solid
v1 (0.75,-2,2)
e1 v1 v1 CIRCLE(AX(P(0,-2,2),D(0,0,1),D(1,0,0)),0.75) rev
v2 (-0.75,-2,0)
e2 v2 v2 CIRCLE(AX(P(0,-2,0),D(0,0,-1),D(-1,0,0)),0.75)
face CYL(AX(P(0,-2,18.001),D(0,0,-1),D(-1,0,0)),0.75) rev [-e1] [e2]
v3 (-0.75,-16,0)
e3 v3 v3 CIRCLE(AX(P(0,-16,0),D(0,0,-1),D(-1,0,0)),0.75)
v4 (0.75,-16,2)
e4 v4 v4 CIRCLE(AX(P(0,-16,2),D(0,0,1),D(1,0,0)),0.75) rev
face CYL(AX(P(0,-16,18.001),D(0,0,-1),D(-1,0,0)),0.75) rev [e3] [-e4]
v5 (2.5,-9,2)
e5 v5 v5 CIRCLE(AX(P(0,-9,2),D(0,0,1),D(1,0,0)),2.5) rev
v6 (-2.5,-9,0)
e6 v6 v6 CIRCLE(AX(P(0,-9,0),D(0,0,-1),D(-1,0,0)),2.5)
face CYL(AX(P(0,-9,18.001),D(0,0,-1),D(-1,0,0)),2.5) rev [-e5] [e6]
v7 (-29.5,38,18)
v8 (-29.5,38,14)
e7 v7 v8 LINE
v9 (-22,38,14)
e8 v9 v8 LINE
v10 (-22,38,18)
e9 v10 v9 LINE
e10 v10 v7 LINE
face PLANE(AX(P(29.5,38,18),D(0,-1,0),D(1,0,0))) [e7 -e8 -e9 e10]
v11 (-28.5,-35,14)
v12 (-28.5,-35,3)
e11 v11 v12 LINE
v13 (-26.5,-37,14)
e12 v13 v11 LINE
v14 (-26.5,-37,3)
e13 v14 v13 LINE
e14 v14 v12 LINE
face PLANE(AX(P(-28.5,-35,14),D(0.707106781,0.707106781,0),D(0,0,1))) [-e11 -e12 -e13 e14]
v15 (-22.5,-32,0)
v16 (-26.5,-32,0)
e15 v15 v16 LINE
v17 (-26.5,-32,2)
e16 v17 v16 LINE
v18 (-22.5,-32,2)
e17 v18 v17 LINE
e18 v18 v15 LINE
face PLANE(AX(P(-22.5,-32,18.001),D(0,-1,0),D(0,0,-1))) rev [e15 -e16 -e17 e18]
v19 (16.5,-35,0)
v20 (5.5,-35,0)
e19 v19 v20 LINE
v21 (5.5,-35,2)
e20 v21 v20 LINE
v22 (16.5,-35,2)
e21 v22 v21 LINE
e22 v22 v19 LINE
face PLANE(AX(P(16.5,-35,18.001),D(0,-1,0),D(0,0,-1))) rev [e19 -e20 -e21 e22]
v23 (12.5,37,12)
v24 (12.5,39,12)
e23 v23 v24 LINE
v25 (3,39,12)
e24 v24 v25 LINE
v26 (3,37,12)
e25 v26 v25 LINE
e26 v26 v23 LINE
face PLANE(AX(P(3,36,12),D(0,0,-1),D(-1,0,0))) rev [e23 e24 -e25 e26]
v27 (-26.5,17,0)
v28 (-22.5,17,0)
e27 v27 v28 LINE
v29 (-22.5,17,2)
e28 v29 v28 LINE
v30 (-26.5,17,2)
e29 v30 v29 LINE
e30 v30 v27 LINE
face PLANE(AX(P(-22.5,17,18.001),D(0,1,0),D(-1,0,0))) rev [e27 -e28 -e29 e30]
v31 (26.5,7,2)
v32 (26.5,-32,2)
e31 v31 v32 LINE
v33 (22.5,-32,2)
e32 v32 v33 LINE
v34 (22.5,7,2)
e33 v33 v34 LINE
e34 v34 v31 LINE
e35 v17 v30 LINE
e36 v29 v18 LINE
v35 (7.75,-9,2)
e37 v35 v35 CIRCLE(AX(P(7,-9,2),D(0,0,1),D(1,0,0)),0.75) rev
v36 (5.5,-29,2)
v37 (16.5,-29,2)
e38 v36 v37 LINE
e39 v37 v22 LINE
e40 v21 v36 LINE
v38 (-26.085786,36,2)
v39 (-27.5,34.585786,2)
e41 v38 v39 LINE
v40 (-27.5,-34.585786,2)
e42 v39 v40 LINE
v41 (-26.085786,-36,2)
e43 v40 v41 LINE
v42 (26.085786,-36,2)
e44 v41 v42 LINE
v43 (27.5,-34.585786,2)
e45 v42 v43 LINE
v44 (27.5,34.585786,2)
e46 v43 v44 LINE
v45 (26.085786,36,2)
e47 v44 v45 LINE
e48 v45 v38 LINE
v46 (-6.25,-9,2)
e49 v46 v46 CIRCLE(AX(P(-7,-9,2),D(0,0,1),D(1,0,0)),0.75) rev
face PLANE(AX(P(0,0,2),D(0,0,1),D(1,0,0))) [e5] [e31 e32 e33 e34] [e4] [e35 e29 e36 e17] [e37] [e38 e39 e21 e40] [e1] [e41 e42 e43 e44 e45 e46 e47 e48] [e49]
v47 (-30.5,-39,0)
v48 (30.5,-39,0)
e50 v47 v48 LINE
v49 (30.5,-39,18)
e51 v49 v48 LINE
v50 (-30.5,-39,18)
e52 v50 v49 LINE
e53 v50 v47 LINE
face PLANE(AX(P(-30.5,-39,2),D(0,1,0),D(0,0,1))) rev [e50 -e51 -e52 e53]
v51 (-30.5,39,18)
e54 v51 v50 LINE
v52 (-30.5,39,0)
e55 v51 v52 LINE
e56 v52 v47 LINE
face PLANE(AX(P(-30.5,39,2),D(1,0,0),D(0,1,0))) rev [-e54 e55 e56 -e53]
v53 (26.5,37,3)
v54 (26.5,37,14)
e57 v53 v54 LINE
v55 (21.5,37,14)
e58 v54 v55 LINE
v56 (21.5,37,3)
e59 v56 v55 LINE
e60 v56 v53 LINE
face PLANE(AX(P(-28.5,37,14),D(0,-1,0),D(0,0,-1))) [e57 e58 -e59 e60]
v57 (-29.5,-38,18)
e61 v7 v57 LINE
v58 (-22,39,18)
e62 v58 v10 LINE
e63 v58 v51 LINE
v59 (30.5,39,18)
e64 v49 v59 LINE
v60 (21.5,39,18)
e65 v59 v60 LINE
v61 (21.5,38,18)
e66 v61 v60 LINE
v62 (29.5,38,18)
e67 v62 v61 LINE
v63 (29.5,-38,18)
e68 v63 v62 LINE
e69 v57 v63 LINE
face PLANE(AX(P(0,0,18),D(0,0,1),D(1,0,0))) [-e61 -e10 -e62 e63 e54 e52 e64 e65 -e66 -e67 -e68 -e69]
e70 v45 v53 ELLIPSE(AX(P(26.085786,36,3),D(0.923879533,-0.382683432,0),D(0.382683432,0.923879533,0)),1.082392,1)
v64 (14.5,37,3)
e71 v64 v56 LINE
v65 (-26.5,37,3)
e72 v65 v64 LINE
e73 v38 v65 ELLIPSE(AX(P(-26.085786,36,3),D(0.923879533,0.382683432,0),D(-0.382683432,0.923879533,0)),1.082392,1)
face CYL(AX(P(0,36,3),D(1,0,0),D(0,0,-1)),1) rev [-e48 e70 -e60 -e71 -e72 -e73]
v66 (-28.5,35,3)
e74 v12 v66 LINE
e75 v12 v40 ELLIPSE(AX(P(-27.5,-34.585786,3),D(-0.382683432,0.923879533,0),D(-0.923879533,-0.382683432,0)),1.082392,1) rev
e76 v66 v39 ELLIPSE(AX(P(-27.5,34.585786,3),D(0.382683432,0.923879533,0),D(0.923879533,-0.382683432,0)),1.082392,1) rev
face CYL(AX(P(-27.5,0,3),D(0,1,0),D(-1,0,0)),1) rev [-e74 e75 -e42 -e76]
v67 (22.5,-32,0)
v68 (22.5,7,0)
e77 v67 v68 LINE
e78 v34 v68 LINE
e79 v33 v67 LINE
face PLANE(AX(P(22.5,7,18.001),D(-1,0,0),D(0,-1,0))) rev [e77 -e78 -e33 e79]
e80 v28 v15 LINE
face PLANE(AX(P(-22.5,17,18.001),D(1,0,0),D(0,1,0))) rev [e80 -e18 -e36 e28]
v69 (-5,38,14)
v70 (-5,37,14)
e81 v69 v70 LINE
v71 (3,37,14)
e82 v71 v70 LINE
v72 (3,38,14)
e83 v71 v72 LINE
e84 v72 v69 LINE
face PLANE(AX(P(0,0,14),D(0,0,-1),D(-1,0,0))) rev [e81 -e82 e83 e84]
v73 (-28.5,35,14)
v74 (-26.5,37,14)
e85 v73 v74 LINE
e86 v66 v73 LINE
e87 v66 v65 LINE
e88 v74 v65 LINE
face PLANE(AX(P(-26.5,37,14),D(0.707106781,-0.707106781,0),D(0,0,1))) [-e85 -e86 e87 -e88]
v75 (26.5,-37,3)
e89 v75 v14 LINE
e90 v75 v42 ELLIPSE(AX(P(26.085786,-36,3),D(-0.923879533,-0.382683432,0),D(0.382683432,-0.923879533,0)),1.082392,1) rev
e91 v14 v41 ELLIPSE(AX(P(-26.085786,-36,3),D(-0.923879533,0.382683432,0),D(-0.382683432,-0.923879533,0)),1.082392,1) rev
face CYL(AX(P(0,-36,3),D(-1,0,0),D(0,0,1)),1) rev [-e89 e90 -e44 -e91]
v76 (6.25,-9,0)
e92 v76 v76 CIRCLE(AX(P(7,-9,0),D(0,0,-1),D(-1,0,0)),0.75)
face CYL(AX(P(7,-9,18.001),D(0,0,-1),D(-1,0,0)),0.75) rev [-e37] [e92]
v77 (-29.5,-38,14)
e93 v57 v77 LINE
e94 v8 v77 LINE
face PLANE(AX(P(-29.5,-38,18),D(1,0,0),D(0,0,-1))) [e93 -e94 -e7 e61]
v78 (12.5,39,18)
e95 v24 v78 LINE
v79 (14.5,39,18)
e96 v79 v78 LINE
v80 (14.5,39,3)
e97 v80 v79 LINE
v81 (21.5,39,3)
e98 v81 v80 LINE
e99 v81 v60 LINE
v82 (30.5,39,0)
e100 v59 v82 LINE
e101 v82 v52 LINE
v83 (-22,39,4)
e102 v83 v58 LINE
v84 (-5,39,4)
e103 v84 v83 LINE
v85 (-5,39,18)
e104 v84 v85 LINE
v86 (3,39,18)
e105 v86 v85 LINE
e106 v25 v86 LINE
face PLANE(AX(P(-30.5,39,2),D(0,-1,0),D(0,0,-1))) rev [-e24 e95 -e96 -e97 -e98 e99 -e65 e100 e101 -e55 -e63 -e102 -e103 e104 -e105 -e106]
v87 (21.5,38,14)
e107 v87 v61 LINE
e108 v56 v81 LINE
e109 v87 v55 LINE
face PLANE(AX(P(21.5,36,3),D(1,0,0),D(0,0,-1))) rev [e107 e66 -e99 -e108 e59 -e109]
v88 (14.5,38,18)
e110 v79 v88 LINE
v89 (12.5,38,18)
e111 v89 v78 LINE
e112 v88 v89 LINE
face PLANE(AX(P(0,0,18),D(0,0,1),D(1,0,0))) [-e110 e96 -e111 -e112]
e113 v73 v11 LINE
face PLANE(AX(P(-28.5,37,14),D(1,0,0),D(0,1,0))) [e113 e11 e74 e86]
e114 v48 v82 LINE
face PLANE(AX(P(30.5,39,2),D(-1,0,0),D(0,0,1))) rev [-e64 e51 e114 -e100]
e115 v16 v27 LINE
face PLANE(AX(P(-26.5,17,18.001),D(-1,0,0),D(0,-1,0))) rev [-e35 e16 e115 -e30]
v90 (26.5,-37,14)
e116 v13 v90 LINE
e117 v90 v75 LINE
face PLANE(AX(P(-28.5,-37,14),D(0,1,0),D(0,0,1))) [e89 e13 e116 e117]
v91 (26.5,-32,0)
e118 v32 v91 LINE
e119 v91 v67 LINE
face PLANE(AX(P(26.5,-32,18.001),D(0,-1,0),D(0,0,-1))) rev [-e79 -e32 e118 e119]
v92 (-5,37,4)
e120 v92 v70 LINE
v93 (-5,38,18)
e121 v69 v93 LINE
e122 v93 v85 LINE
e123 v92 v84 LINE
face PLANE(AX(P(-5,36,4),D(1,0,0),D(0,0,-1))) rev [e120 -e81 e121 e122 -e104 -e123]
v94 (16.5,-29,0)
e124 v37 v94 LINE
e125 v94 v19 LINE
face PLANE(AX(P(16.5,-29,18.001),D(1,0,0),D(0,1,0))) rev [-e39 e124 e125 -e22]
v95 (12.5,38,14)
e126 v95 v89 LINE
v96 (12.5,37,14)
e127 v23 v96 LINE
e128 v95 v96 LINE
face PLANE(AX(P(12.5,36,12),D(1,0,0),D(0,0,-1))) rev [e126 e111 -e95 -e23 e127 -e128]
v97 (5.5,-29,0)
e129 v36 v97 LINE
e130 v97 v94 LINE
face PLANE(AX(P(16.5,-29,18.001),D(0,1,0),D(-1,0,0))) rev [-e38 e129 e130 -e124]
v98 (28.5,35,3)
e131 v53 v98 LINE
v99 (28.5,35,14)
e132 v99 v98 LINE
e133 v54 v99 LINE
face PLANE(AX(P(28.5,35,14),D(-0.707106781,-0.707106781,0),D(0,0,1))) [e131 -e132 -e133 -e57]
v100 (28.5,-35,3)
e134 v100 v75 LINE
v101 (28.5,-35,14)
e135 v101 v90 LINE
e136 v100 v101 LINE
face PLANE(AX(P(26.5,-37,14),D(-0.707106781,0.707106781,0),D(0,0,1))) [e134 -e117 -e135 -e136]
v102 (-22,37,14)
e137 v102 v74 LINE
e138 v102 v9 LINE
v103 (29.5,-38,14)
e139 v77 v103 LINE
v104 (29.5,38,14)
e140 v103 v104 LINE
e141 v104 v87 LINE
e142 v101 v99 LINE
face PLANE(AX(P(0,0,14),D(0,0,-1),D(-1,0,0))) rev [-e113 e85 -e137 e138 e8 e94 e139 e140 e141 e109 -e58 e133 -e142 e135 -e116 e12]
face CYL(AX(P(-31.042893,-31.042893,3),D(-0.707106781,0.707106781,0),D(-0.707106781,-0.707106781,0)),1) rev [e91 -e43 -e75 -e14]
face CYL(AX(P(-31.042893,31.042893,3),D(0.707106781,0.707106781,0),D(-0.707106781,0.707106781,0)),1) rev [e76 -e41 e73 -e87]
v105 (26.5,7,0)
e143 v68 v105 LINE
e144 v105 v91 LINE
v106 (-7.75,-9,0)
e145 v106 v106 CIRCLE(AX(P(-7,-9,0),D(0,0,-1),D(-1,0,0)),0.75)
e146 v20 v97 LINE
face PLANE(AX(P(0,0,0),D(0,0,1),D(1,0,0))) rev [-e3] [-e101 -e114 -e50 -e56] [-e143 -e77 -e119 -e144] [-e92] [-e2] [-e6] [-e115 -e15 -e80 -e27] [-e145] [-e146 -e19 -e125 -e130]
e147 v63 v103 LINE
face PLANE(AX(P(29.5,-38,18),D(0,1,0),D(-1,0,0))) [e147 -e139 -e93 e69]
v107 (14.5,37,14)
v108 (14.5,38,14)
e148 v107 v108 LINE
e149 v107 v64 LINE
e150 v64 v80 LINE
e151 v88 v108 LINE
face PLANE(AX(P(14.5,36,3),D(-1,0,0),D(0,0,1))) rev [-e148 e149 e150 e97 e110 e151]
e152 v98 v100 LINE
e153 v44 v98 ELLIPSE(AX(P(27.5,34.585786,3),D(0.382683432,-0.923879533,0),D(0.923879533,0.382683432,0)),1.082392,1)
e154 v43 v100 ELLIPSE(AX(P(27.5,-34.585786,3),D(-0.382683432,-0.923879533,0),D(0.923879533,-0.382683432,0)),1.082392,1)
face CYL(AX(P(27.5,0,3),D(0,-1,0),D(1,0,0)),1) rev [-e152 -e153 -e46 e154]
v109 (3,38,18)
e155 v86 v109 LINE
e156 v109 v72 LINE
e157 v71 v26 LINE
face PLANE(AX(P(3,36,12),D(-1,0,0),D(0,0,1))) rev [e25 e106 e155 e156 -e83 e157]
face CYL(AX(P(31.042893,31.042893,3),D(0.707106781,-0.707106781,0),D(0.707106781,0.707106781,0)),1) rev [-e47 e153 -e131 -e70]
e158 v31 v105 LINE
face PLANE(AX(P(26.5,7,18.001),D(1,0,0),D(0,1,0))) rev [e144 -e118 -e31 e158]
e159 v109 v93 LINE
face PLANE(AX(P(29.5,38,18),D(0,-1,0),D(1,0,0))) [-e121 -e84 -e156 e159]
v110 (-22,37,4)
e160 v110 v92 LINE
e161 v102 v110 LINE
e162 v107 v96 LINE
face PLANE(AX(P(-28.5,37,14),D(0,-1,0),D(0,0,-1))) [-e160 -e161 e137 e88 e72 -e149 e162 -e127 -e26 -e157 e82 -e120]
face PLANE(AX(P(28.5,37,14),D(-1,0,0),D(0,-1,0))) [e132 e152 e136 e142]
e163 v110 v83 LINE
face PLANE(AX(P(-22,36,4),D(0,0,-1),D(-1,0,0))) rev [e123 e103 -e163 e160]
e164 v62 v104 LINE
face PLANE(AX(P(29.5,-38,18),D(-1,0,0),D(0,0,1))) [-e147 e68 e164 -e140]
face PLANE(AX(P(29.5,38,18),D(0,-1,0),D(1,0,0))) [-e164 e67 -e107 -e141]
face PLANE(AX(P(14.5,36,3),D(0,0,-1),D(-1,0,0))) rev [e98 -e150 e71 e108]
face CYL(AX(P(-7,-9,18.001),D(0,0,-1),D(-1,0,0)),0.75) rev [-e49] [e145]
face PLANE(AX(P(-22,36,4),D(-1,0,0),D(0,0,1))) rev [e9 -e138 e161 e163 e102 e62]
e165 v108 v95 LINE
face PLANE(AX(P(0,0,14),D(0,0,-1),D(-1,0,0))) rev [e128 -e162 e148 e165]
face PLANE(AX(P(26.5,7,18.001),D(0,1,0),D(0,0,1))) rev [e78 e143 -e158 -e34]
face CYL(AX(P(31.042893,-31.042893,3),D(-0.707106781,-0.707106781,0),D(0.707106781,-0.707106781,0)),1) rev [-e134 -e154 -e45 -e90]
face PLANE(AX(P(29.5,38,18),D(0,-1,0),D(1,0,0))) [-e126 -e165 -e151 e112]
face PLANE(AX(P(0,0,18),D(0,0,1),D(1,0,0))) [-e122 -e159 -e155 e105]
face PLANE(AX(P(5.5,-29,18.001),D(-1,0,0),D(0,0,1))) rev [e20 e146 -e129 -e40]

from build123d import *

# Parameters (mm, degrees)
ESQUISSE1_W             = 61
ESQUISSE1_H             = 78
BOSS_EXTRU_1_DEPTH      = 2
ESQUISSE2_W             = 61
ESQUISSE2_H             = 78
ESQUISSE2_W_2           = 57
ESQUISSE2_H_2           = 74
BOSS_EXTRU_2_DEPTH      = 12
ESQUISSE3_W             = 61
ESQUISSE3_H             = 78
ESQUISSE3_W_2           = 59
ESQUISSE3_H_2           = 76
BOSS_EXTRU_3_DEPTH      = 4
ESQUISSE7_W             = 17
ESQUISSE7_H             = 20.984875374
ESQUISSE7_W_2           = 7
ESQUISSE7_H_2           = 18.09159362
ESQUISSE7_W_3           = 9.5
ESQUISSE7_H_3           = 11.016430182
ENL_V_MAT_EXTRU_2_DEPTH = 3
ENL_V_MAT_EXTRU_3_REACH = 54.681
ESQUISSE8_W             = 4
ESQUISSE8_H             = 39
ESQUISSE8_H_2           = 49
ESQUISSE8_W_2           = 11
ESQUISSE8_H_3           = 6
CHANFREIN1_SIZE         = 2
ENL_V_MAT_EXTRU_4_REACH = 54.681
ESQUISSE9_R             = 2.5
ESQUISSE9_R_2           = 0.75
CONG_1_R                = 1


with BuildPart() as part:
    # Esquisse1 → Boss.-Extru.1 (new body)
    with BuildSketch(Plane.XY):
        Rectangle(ESQUISSE1_W, ESQUISSE1_H)
    extrude(amount=BOSS_EXTRU_1_DEPTH)

    # Esquisse2 → Boss.-Extru.2 (add)
    with BuildSketch(Plane.XY.offset(2)):
        Rectangle(ESQUISSE2_W, ESQUISSE2_H)
        Rectangle(ESQUISSE2_W_2, ESQUISSE2_H_2, mode=Mode.SUBTRACT)
    extrude(amount=BOSS_EXTRU_2_DEPTH)

    # Esquisse3 → Boss.-Extru.3 (add)
    with BuildSketch(Plane.XY.offset(14)):
        Rectangle(ESQUISSE3_W, ESQUISSE3_H)
        Rectangle(ESQUISSE3_W_2, ESQUISSE3_H_2, mode=Mode.SUBTRACT)
    extrude(amount=BOSS_EXTRU_3_DEPTH)

    # Esquisse7 → Enlèv. mat.-Extru.2 (cut)
    with BuildSketch(Plane(origin=(0, 39, 0), x_dir=(1, 0, 0), z_dir=(0, 1, 0))):
        with Locations((-13.5, -14.492437687)):
            Rectangle(ESQUISSE7_W, ESQUISSE7_H)
        with Locations((18, -12.04579681)):
            Rectangle(ESQUISSE7_W_2, ESQUISSE7_H_2)
        with Locations((7.75, -17.508215091)):
            Rectangle(ESQUISSE7_W_3, ESQUISSE7_H_3)
    extrude(amount=-ENL_V_MAT_EXTRU_2_DEPTH, mode=Mode.SUBTRACT)

    # Esquisse8 → Enlèv. mat.-Extru.3 (cut, up to next)
    with BuildSketch(Plane(origin=(0, 0, 0), x_dir=(-1, 0, 0), z_dir=(0, 0, -1)), mode=Mode.PRIVATE) as enl_v_mat_extru_3_sk1:
        with Locations((-24.5, -12.5)):
            Rectangle(ESQUISSE8_W, ESQUISSE8_H)
    enl_v_mat_extru_3_tool1 = extrude(enl_v_mat_extru_3_sk1.sketch, amount=-ENL_V_MAT_EXTRU_3_REACH, mode=Mode.PRIVATE) & part.part
    # Esquisse8 → Enlèv. mat.-Extru.3 (cut, up to next)
    with BuildSketch(Plane(origin=(0, 0, 0), x_dir=(-1, 0, 0), z_dir=(0, 0, -1)), mode=Mode.PRIVATE) as enl_v_mat_extru_3_sk2:
        with Locations((24.5, -7.5)):
            Rectangle(ESQUISSE8_W, ESQUISSE8_H_2)
    enl_v_mat_extru_3_tool2 = extrude(enl_v_mat_extru_3_sk2.sketch, amount=-ENL_V_MAT_EXTRU_3_REACH, mode=Mode.PRIVATE) & part.part
    # Esquisse8 → Enlèv. mat.-Extru.3 (cut, up to next)
    with BuildSketch(Plane(origin=(0, 0, 0), x_dir=(-1, 0, 0), z_dir=(0, 0, -1)), mode=Mode.PRIVATE) as enl_v_mat_extru_3_sk3:
        with Locations((-11, -32)):
            Rectangle(ESQUISSE8_W_2, ESQUISSE8_H_3)
    enl_v_mat_extru_3_tool3 = extrude(enl_v_mat_extru_3_sk3.sketch, amount=-ENL_V_MAT_EXTRU_3_REACH, mode=Mode.PRIVATE) & part.part
    add(enl_v_mat_extru_3_tool1.solids().sort_by_distance((24.5, -12.5, 0))[0], mode=Mode.SUBTRACT)
    add(enl_v_mat_extru_3_tool2.solids().sort_by_distance((-24.5, -7.5, 0))[0], mode=Mode.SUBTRACT)
    add(enl_v_mat_extru_3_tool3.solids().sort_by_distance((11, -32, 0))[0], mode=Mode.SUBTRACT)

    # Chanfrein1
    chanfrein1_edges = [part.edges().sort_by_distance(p)[0] for p in [
        (-28.5, -37, 8),
        (28.5, -37, 8),
        (28.5, 37, 8),
        (-28.5, 37, 8),
    ]]
    chamfer(chanfrein1_edges, length=CHANFREIN1_SIZE)

    # Esquisse9 → Enlèv. mat.-Extru.4 (cut, up to next)
    with BuildSketch(Plane(origin=(0, 0, 0), x_dir=(-1, 0, 0), z_dir=(0, 0, -1)), mode=Mode.PRIVATE) as enl_v_mat_extru_4_sk1:
        with Locations((0, -9)):
            Circle(ESQUISSE9_R)
    enl_v_mat_extru_4_tool1 = extrude(enl_v_mat_extru_4_sk1.sketch, amount=-ENL_V_MAT_EXTRU_4_REACH, mode=Mode.PRIVATE) & part.part
    # Esquisse9 → Enlèv. mat.-Extru.4 (cut, up to next)
    with BuildSketch(Plane(origin=(0, 0, 0), x_dir=(-1, 0, 0), z_dir=(0, 0, -1)), mode=Mode.PRIVATE) as enl_v_mat_extru_4_sk2:
        with Locations((-7, -9)):
            Circle(ESQUISSE9_R_2)
    enl_v_mat_extru_4_tool2 = extrude(enl_v_mat_extru_4_sk2.sketch, amount=-ENL_V_MAT_EXTRU_4_REACH, mode=Mode.PRIVATE) & part.part
    # Esquisse9 → Enlèv. mat.-Extru.4 (cut, up to next)
    with BuildSketch(Plane(origin=(0, 0, 0), x_dir=(-1, 0, 0), z_dir=(0, 0, -1)), mode=Mode.PRIVATE) as enl_v_mat_extru_4_sk3:
        with Locations((7, -9)):
            Circle(ESQUISSE9_R_2)
    enl_v_mat_extru_4_tool3 = extrude(enl_v_mat_extru_4_sk3.sketch, amount=-ENL_V_MAT_EXTRU_4_REACH, mode=Mode.PRIVATE) & part.part
    # Esquisse9 → Enlèv. mat.-Extru.4 (cut, up to next)
    with BuildSketch(Plane(origin=(0, 0, 0), x_dir=(-1, 0, 0), z_dir=(0, 0, -1)), mode=Mode.PRIVATE) as enl_v_mat_extru_4_sk4:
        with Locations((0, -2)):
            Circle(ESQUISSE9_R_2)
    enl_v_mat_extru_4_tool4 = extrude(enl_v_mat_extru_4_sk4.sketch, amount=-ENL_V_MAT_EXTRU_4_REACH, mode=Mode.PRIVATE) & part.part
    # Esquisse9 → Enlèv. mat.-Extru.4 (cut, up to next)
    with BuildSketch(Plane(origin=(0, 0, 0), x_dir=(-1, 0, 0), z_dir=(0, 0, -1)), mode=Mode.PRIVATE) as enl_v_mat_extru_4_sk5:
        with Locations((0, -16)):
            Circle(ESQUISSE9_R_2)
    enl_v_mat_extru_4_tool5 = extrude(enl_v_mat_extru_4_sk5.sketch, amount=-ENL_V_MAT_EXTRU_4_REACH, mode=Mode.PRIVATE) & part.part
    add(enl_v_mat_extru_4_tool1.solids().sort_by_distance((0, -9, 0))[0], mode=Mode.SUBTRACT)
    add(enl_v_mat_extru_4_tool2.solids().sort_by_distance((7, -9, 0))[0], mode=Mode.SUBTRACT)
    add(enl_v_mat_extru_4_tool3.solids().sort_by_distance((-7, -9, 0))[0], mode=Mode.SUBTRACT)
    add(enl_v_mat_extru_4_tool4.solids().sort_by_distance((0, -2, 0))[0], mode=Mode.SUBTRACT)
    add(enl_v_mat_extru_4_tool5.solids().sort_by_distance((0, -16, 0))[0], mode=Mode.SUBTRACT)

    # Congé1
    cong_1_edges = [part.edges().sort_by_distance(p)[0] for p in [
        (0, 37, 2),
        (-28.5, 0, 2),
        (0, -37, 2),
        (28.5, 0, 2),
        (27.5, 36, 2),
        (27.5, -36, 2),
        (-27.5, -36, 2),
        (-27.5, 36, 2),
    ]]
    fillet(cong_1_edges, radius=CONG_1_R - 0.0001)  # a hair under: the kernel refuses the full size


solid = part.part
